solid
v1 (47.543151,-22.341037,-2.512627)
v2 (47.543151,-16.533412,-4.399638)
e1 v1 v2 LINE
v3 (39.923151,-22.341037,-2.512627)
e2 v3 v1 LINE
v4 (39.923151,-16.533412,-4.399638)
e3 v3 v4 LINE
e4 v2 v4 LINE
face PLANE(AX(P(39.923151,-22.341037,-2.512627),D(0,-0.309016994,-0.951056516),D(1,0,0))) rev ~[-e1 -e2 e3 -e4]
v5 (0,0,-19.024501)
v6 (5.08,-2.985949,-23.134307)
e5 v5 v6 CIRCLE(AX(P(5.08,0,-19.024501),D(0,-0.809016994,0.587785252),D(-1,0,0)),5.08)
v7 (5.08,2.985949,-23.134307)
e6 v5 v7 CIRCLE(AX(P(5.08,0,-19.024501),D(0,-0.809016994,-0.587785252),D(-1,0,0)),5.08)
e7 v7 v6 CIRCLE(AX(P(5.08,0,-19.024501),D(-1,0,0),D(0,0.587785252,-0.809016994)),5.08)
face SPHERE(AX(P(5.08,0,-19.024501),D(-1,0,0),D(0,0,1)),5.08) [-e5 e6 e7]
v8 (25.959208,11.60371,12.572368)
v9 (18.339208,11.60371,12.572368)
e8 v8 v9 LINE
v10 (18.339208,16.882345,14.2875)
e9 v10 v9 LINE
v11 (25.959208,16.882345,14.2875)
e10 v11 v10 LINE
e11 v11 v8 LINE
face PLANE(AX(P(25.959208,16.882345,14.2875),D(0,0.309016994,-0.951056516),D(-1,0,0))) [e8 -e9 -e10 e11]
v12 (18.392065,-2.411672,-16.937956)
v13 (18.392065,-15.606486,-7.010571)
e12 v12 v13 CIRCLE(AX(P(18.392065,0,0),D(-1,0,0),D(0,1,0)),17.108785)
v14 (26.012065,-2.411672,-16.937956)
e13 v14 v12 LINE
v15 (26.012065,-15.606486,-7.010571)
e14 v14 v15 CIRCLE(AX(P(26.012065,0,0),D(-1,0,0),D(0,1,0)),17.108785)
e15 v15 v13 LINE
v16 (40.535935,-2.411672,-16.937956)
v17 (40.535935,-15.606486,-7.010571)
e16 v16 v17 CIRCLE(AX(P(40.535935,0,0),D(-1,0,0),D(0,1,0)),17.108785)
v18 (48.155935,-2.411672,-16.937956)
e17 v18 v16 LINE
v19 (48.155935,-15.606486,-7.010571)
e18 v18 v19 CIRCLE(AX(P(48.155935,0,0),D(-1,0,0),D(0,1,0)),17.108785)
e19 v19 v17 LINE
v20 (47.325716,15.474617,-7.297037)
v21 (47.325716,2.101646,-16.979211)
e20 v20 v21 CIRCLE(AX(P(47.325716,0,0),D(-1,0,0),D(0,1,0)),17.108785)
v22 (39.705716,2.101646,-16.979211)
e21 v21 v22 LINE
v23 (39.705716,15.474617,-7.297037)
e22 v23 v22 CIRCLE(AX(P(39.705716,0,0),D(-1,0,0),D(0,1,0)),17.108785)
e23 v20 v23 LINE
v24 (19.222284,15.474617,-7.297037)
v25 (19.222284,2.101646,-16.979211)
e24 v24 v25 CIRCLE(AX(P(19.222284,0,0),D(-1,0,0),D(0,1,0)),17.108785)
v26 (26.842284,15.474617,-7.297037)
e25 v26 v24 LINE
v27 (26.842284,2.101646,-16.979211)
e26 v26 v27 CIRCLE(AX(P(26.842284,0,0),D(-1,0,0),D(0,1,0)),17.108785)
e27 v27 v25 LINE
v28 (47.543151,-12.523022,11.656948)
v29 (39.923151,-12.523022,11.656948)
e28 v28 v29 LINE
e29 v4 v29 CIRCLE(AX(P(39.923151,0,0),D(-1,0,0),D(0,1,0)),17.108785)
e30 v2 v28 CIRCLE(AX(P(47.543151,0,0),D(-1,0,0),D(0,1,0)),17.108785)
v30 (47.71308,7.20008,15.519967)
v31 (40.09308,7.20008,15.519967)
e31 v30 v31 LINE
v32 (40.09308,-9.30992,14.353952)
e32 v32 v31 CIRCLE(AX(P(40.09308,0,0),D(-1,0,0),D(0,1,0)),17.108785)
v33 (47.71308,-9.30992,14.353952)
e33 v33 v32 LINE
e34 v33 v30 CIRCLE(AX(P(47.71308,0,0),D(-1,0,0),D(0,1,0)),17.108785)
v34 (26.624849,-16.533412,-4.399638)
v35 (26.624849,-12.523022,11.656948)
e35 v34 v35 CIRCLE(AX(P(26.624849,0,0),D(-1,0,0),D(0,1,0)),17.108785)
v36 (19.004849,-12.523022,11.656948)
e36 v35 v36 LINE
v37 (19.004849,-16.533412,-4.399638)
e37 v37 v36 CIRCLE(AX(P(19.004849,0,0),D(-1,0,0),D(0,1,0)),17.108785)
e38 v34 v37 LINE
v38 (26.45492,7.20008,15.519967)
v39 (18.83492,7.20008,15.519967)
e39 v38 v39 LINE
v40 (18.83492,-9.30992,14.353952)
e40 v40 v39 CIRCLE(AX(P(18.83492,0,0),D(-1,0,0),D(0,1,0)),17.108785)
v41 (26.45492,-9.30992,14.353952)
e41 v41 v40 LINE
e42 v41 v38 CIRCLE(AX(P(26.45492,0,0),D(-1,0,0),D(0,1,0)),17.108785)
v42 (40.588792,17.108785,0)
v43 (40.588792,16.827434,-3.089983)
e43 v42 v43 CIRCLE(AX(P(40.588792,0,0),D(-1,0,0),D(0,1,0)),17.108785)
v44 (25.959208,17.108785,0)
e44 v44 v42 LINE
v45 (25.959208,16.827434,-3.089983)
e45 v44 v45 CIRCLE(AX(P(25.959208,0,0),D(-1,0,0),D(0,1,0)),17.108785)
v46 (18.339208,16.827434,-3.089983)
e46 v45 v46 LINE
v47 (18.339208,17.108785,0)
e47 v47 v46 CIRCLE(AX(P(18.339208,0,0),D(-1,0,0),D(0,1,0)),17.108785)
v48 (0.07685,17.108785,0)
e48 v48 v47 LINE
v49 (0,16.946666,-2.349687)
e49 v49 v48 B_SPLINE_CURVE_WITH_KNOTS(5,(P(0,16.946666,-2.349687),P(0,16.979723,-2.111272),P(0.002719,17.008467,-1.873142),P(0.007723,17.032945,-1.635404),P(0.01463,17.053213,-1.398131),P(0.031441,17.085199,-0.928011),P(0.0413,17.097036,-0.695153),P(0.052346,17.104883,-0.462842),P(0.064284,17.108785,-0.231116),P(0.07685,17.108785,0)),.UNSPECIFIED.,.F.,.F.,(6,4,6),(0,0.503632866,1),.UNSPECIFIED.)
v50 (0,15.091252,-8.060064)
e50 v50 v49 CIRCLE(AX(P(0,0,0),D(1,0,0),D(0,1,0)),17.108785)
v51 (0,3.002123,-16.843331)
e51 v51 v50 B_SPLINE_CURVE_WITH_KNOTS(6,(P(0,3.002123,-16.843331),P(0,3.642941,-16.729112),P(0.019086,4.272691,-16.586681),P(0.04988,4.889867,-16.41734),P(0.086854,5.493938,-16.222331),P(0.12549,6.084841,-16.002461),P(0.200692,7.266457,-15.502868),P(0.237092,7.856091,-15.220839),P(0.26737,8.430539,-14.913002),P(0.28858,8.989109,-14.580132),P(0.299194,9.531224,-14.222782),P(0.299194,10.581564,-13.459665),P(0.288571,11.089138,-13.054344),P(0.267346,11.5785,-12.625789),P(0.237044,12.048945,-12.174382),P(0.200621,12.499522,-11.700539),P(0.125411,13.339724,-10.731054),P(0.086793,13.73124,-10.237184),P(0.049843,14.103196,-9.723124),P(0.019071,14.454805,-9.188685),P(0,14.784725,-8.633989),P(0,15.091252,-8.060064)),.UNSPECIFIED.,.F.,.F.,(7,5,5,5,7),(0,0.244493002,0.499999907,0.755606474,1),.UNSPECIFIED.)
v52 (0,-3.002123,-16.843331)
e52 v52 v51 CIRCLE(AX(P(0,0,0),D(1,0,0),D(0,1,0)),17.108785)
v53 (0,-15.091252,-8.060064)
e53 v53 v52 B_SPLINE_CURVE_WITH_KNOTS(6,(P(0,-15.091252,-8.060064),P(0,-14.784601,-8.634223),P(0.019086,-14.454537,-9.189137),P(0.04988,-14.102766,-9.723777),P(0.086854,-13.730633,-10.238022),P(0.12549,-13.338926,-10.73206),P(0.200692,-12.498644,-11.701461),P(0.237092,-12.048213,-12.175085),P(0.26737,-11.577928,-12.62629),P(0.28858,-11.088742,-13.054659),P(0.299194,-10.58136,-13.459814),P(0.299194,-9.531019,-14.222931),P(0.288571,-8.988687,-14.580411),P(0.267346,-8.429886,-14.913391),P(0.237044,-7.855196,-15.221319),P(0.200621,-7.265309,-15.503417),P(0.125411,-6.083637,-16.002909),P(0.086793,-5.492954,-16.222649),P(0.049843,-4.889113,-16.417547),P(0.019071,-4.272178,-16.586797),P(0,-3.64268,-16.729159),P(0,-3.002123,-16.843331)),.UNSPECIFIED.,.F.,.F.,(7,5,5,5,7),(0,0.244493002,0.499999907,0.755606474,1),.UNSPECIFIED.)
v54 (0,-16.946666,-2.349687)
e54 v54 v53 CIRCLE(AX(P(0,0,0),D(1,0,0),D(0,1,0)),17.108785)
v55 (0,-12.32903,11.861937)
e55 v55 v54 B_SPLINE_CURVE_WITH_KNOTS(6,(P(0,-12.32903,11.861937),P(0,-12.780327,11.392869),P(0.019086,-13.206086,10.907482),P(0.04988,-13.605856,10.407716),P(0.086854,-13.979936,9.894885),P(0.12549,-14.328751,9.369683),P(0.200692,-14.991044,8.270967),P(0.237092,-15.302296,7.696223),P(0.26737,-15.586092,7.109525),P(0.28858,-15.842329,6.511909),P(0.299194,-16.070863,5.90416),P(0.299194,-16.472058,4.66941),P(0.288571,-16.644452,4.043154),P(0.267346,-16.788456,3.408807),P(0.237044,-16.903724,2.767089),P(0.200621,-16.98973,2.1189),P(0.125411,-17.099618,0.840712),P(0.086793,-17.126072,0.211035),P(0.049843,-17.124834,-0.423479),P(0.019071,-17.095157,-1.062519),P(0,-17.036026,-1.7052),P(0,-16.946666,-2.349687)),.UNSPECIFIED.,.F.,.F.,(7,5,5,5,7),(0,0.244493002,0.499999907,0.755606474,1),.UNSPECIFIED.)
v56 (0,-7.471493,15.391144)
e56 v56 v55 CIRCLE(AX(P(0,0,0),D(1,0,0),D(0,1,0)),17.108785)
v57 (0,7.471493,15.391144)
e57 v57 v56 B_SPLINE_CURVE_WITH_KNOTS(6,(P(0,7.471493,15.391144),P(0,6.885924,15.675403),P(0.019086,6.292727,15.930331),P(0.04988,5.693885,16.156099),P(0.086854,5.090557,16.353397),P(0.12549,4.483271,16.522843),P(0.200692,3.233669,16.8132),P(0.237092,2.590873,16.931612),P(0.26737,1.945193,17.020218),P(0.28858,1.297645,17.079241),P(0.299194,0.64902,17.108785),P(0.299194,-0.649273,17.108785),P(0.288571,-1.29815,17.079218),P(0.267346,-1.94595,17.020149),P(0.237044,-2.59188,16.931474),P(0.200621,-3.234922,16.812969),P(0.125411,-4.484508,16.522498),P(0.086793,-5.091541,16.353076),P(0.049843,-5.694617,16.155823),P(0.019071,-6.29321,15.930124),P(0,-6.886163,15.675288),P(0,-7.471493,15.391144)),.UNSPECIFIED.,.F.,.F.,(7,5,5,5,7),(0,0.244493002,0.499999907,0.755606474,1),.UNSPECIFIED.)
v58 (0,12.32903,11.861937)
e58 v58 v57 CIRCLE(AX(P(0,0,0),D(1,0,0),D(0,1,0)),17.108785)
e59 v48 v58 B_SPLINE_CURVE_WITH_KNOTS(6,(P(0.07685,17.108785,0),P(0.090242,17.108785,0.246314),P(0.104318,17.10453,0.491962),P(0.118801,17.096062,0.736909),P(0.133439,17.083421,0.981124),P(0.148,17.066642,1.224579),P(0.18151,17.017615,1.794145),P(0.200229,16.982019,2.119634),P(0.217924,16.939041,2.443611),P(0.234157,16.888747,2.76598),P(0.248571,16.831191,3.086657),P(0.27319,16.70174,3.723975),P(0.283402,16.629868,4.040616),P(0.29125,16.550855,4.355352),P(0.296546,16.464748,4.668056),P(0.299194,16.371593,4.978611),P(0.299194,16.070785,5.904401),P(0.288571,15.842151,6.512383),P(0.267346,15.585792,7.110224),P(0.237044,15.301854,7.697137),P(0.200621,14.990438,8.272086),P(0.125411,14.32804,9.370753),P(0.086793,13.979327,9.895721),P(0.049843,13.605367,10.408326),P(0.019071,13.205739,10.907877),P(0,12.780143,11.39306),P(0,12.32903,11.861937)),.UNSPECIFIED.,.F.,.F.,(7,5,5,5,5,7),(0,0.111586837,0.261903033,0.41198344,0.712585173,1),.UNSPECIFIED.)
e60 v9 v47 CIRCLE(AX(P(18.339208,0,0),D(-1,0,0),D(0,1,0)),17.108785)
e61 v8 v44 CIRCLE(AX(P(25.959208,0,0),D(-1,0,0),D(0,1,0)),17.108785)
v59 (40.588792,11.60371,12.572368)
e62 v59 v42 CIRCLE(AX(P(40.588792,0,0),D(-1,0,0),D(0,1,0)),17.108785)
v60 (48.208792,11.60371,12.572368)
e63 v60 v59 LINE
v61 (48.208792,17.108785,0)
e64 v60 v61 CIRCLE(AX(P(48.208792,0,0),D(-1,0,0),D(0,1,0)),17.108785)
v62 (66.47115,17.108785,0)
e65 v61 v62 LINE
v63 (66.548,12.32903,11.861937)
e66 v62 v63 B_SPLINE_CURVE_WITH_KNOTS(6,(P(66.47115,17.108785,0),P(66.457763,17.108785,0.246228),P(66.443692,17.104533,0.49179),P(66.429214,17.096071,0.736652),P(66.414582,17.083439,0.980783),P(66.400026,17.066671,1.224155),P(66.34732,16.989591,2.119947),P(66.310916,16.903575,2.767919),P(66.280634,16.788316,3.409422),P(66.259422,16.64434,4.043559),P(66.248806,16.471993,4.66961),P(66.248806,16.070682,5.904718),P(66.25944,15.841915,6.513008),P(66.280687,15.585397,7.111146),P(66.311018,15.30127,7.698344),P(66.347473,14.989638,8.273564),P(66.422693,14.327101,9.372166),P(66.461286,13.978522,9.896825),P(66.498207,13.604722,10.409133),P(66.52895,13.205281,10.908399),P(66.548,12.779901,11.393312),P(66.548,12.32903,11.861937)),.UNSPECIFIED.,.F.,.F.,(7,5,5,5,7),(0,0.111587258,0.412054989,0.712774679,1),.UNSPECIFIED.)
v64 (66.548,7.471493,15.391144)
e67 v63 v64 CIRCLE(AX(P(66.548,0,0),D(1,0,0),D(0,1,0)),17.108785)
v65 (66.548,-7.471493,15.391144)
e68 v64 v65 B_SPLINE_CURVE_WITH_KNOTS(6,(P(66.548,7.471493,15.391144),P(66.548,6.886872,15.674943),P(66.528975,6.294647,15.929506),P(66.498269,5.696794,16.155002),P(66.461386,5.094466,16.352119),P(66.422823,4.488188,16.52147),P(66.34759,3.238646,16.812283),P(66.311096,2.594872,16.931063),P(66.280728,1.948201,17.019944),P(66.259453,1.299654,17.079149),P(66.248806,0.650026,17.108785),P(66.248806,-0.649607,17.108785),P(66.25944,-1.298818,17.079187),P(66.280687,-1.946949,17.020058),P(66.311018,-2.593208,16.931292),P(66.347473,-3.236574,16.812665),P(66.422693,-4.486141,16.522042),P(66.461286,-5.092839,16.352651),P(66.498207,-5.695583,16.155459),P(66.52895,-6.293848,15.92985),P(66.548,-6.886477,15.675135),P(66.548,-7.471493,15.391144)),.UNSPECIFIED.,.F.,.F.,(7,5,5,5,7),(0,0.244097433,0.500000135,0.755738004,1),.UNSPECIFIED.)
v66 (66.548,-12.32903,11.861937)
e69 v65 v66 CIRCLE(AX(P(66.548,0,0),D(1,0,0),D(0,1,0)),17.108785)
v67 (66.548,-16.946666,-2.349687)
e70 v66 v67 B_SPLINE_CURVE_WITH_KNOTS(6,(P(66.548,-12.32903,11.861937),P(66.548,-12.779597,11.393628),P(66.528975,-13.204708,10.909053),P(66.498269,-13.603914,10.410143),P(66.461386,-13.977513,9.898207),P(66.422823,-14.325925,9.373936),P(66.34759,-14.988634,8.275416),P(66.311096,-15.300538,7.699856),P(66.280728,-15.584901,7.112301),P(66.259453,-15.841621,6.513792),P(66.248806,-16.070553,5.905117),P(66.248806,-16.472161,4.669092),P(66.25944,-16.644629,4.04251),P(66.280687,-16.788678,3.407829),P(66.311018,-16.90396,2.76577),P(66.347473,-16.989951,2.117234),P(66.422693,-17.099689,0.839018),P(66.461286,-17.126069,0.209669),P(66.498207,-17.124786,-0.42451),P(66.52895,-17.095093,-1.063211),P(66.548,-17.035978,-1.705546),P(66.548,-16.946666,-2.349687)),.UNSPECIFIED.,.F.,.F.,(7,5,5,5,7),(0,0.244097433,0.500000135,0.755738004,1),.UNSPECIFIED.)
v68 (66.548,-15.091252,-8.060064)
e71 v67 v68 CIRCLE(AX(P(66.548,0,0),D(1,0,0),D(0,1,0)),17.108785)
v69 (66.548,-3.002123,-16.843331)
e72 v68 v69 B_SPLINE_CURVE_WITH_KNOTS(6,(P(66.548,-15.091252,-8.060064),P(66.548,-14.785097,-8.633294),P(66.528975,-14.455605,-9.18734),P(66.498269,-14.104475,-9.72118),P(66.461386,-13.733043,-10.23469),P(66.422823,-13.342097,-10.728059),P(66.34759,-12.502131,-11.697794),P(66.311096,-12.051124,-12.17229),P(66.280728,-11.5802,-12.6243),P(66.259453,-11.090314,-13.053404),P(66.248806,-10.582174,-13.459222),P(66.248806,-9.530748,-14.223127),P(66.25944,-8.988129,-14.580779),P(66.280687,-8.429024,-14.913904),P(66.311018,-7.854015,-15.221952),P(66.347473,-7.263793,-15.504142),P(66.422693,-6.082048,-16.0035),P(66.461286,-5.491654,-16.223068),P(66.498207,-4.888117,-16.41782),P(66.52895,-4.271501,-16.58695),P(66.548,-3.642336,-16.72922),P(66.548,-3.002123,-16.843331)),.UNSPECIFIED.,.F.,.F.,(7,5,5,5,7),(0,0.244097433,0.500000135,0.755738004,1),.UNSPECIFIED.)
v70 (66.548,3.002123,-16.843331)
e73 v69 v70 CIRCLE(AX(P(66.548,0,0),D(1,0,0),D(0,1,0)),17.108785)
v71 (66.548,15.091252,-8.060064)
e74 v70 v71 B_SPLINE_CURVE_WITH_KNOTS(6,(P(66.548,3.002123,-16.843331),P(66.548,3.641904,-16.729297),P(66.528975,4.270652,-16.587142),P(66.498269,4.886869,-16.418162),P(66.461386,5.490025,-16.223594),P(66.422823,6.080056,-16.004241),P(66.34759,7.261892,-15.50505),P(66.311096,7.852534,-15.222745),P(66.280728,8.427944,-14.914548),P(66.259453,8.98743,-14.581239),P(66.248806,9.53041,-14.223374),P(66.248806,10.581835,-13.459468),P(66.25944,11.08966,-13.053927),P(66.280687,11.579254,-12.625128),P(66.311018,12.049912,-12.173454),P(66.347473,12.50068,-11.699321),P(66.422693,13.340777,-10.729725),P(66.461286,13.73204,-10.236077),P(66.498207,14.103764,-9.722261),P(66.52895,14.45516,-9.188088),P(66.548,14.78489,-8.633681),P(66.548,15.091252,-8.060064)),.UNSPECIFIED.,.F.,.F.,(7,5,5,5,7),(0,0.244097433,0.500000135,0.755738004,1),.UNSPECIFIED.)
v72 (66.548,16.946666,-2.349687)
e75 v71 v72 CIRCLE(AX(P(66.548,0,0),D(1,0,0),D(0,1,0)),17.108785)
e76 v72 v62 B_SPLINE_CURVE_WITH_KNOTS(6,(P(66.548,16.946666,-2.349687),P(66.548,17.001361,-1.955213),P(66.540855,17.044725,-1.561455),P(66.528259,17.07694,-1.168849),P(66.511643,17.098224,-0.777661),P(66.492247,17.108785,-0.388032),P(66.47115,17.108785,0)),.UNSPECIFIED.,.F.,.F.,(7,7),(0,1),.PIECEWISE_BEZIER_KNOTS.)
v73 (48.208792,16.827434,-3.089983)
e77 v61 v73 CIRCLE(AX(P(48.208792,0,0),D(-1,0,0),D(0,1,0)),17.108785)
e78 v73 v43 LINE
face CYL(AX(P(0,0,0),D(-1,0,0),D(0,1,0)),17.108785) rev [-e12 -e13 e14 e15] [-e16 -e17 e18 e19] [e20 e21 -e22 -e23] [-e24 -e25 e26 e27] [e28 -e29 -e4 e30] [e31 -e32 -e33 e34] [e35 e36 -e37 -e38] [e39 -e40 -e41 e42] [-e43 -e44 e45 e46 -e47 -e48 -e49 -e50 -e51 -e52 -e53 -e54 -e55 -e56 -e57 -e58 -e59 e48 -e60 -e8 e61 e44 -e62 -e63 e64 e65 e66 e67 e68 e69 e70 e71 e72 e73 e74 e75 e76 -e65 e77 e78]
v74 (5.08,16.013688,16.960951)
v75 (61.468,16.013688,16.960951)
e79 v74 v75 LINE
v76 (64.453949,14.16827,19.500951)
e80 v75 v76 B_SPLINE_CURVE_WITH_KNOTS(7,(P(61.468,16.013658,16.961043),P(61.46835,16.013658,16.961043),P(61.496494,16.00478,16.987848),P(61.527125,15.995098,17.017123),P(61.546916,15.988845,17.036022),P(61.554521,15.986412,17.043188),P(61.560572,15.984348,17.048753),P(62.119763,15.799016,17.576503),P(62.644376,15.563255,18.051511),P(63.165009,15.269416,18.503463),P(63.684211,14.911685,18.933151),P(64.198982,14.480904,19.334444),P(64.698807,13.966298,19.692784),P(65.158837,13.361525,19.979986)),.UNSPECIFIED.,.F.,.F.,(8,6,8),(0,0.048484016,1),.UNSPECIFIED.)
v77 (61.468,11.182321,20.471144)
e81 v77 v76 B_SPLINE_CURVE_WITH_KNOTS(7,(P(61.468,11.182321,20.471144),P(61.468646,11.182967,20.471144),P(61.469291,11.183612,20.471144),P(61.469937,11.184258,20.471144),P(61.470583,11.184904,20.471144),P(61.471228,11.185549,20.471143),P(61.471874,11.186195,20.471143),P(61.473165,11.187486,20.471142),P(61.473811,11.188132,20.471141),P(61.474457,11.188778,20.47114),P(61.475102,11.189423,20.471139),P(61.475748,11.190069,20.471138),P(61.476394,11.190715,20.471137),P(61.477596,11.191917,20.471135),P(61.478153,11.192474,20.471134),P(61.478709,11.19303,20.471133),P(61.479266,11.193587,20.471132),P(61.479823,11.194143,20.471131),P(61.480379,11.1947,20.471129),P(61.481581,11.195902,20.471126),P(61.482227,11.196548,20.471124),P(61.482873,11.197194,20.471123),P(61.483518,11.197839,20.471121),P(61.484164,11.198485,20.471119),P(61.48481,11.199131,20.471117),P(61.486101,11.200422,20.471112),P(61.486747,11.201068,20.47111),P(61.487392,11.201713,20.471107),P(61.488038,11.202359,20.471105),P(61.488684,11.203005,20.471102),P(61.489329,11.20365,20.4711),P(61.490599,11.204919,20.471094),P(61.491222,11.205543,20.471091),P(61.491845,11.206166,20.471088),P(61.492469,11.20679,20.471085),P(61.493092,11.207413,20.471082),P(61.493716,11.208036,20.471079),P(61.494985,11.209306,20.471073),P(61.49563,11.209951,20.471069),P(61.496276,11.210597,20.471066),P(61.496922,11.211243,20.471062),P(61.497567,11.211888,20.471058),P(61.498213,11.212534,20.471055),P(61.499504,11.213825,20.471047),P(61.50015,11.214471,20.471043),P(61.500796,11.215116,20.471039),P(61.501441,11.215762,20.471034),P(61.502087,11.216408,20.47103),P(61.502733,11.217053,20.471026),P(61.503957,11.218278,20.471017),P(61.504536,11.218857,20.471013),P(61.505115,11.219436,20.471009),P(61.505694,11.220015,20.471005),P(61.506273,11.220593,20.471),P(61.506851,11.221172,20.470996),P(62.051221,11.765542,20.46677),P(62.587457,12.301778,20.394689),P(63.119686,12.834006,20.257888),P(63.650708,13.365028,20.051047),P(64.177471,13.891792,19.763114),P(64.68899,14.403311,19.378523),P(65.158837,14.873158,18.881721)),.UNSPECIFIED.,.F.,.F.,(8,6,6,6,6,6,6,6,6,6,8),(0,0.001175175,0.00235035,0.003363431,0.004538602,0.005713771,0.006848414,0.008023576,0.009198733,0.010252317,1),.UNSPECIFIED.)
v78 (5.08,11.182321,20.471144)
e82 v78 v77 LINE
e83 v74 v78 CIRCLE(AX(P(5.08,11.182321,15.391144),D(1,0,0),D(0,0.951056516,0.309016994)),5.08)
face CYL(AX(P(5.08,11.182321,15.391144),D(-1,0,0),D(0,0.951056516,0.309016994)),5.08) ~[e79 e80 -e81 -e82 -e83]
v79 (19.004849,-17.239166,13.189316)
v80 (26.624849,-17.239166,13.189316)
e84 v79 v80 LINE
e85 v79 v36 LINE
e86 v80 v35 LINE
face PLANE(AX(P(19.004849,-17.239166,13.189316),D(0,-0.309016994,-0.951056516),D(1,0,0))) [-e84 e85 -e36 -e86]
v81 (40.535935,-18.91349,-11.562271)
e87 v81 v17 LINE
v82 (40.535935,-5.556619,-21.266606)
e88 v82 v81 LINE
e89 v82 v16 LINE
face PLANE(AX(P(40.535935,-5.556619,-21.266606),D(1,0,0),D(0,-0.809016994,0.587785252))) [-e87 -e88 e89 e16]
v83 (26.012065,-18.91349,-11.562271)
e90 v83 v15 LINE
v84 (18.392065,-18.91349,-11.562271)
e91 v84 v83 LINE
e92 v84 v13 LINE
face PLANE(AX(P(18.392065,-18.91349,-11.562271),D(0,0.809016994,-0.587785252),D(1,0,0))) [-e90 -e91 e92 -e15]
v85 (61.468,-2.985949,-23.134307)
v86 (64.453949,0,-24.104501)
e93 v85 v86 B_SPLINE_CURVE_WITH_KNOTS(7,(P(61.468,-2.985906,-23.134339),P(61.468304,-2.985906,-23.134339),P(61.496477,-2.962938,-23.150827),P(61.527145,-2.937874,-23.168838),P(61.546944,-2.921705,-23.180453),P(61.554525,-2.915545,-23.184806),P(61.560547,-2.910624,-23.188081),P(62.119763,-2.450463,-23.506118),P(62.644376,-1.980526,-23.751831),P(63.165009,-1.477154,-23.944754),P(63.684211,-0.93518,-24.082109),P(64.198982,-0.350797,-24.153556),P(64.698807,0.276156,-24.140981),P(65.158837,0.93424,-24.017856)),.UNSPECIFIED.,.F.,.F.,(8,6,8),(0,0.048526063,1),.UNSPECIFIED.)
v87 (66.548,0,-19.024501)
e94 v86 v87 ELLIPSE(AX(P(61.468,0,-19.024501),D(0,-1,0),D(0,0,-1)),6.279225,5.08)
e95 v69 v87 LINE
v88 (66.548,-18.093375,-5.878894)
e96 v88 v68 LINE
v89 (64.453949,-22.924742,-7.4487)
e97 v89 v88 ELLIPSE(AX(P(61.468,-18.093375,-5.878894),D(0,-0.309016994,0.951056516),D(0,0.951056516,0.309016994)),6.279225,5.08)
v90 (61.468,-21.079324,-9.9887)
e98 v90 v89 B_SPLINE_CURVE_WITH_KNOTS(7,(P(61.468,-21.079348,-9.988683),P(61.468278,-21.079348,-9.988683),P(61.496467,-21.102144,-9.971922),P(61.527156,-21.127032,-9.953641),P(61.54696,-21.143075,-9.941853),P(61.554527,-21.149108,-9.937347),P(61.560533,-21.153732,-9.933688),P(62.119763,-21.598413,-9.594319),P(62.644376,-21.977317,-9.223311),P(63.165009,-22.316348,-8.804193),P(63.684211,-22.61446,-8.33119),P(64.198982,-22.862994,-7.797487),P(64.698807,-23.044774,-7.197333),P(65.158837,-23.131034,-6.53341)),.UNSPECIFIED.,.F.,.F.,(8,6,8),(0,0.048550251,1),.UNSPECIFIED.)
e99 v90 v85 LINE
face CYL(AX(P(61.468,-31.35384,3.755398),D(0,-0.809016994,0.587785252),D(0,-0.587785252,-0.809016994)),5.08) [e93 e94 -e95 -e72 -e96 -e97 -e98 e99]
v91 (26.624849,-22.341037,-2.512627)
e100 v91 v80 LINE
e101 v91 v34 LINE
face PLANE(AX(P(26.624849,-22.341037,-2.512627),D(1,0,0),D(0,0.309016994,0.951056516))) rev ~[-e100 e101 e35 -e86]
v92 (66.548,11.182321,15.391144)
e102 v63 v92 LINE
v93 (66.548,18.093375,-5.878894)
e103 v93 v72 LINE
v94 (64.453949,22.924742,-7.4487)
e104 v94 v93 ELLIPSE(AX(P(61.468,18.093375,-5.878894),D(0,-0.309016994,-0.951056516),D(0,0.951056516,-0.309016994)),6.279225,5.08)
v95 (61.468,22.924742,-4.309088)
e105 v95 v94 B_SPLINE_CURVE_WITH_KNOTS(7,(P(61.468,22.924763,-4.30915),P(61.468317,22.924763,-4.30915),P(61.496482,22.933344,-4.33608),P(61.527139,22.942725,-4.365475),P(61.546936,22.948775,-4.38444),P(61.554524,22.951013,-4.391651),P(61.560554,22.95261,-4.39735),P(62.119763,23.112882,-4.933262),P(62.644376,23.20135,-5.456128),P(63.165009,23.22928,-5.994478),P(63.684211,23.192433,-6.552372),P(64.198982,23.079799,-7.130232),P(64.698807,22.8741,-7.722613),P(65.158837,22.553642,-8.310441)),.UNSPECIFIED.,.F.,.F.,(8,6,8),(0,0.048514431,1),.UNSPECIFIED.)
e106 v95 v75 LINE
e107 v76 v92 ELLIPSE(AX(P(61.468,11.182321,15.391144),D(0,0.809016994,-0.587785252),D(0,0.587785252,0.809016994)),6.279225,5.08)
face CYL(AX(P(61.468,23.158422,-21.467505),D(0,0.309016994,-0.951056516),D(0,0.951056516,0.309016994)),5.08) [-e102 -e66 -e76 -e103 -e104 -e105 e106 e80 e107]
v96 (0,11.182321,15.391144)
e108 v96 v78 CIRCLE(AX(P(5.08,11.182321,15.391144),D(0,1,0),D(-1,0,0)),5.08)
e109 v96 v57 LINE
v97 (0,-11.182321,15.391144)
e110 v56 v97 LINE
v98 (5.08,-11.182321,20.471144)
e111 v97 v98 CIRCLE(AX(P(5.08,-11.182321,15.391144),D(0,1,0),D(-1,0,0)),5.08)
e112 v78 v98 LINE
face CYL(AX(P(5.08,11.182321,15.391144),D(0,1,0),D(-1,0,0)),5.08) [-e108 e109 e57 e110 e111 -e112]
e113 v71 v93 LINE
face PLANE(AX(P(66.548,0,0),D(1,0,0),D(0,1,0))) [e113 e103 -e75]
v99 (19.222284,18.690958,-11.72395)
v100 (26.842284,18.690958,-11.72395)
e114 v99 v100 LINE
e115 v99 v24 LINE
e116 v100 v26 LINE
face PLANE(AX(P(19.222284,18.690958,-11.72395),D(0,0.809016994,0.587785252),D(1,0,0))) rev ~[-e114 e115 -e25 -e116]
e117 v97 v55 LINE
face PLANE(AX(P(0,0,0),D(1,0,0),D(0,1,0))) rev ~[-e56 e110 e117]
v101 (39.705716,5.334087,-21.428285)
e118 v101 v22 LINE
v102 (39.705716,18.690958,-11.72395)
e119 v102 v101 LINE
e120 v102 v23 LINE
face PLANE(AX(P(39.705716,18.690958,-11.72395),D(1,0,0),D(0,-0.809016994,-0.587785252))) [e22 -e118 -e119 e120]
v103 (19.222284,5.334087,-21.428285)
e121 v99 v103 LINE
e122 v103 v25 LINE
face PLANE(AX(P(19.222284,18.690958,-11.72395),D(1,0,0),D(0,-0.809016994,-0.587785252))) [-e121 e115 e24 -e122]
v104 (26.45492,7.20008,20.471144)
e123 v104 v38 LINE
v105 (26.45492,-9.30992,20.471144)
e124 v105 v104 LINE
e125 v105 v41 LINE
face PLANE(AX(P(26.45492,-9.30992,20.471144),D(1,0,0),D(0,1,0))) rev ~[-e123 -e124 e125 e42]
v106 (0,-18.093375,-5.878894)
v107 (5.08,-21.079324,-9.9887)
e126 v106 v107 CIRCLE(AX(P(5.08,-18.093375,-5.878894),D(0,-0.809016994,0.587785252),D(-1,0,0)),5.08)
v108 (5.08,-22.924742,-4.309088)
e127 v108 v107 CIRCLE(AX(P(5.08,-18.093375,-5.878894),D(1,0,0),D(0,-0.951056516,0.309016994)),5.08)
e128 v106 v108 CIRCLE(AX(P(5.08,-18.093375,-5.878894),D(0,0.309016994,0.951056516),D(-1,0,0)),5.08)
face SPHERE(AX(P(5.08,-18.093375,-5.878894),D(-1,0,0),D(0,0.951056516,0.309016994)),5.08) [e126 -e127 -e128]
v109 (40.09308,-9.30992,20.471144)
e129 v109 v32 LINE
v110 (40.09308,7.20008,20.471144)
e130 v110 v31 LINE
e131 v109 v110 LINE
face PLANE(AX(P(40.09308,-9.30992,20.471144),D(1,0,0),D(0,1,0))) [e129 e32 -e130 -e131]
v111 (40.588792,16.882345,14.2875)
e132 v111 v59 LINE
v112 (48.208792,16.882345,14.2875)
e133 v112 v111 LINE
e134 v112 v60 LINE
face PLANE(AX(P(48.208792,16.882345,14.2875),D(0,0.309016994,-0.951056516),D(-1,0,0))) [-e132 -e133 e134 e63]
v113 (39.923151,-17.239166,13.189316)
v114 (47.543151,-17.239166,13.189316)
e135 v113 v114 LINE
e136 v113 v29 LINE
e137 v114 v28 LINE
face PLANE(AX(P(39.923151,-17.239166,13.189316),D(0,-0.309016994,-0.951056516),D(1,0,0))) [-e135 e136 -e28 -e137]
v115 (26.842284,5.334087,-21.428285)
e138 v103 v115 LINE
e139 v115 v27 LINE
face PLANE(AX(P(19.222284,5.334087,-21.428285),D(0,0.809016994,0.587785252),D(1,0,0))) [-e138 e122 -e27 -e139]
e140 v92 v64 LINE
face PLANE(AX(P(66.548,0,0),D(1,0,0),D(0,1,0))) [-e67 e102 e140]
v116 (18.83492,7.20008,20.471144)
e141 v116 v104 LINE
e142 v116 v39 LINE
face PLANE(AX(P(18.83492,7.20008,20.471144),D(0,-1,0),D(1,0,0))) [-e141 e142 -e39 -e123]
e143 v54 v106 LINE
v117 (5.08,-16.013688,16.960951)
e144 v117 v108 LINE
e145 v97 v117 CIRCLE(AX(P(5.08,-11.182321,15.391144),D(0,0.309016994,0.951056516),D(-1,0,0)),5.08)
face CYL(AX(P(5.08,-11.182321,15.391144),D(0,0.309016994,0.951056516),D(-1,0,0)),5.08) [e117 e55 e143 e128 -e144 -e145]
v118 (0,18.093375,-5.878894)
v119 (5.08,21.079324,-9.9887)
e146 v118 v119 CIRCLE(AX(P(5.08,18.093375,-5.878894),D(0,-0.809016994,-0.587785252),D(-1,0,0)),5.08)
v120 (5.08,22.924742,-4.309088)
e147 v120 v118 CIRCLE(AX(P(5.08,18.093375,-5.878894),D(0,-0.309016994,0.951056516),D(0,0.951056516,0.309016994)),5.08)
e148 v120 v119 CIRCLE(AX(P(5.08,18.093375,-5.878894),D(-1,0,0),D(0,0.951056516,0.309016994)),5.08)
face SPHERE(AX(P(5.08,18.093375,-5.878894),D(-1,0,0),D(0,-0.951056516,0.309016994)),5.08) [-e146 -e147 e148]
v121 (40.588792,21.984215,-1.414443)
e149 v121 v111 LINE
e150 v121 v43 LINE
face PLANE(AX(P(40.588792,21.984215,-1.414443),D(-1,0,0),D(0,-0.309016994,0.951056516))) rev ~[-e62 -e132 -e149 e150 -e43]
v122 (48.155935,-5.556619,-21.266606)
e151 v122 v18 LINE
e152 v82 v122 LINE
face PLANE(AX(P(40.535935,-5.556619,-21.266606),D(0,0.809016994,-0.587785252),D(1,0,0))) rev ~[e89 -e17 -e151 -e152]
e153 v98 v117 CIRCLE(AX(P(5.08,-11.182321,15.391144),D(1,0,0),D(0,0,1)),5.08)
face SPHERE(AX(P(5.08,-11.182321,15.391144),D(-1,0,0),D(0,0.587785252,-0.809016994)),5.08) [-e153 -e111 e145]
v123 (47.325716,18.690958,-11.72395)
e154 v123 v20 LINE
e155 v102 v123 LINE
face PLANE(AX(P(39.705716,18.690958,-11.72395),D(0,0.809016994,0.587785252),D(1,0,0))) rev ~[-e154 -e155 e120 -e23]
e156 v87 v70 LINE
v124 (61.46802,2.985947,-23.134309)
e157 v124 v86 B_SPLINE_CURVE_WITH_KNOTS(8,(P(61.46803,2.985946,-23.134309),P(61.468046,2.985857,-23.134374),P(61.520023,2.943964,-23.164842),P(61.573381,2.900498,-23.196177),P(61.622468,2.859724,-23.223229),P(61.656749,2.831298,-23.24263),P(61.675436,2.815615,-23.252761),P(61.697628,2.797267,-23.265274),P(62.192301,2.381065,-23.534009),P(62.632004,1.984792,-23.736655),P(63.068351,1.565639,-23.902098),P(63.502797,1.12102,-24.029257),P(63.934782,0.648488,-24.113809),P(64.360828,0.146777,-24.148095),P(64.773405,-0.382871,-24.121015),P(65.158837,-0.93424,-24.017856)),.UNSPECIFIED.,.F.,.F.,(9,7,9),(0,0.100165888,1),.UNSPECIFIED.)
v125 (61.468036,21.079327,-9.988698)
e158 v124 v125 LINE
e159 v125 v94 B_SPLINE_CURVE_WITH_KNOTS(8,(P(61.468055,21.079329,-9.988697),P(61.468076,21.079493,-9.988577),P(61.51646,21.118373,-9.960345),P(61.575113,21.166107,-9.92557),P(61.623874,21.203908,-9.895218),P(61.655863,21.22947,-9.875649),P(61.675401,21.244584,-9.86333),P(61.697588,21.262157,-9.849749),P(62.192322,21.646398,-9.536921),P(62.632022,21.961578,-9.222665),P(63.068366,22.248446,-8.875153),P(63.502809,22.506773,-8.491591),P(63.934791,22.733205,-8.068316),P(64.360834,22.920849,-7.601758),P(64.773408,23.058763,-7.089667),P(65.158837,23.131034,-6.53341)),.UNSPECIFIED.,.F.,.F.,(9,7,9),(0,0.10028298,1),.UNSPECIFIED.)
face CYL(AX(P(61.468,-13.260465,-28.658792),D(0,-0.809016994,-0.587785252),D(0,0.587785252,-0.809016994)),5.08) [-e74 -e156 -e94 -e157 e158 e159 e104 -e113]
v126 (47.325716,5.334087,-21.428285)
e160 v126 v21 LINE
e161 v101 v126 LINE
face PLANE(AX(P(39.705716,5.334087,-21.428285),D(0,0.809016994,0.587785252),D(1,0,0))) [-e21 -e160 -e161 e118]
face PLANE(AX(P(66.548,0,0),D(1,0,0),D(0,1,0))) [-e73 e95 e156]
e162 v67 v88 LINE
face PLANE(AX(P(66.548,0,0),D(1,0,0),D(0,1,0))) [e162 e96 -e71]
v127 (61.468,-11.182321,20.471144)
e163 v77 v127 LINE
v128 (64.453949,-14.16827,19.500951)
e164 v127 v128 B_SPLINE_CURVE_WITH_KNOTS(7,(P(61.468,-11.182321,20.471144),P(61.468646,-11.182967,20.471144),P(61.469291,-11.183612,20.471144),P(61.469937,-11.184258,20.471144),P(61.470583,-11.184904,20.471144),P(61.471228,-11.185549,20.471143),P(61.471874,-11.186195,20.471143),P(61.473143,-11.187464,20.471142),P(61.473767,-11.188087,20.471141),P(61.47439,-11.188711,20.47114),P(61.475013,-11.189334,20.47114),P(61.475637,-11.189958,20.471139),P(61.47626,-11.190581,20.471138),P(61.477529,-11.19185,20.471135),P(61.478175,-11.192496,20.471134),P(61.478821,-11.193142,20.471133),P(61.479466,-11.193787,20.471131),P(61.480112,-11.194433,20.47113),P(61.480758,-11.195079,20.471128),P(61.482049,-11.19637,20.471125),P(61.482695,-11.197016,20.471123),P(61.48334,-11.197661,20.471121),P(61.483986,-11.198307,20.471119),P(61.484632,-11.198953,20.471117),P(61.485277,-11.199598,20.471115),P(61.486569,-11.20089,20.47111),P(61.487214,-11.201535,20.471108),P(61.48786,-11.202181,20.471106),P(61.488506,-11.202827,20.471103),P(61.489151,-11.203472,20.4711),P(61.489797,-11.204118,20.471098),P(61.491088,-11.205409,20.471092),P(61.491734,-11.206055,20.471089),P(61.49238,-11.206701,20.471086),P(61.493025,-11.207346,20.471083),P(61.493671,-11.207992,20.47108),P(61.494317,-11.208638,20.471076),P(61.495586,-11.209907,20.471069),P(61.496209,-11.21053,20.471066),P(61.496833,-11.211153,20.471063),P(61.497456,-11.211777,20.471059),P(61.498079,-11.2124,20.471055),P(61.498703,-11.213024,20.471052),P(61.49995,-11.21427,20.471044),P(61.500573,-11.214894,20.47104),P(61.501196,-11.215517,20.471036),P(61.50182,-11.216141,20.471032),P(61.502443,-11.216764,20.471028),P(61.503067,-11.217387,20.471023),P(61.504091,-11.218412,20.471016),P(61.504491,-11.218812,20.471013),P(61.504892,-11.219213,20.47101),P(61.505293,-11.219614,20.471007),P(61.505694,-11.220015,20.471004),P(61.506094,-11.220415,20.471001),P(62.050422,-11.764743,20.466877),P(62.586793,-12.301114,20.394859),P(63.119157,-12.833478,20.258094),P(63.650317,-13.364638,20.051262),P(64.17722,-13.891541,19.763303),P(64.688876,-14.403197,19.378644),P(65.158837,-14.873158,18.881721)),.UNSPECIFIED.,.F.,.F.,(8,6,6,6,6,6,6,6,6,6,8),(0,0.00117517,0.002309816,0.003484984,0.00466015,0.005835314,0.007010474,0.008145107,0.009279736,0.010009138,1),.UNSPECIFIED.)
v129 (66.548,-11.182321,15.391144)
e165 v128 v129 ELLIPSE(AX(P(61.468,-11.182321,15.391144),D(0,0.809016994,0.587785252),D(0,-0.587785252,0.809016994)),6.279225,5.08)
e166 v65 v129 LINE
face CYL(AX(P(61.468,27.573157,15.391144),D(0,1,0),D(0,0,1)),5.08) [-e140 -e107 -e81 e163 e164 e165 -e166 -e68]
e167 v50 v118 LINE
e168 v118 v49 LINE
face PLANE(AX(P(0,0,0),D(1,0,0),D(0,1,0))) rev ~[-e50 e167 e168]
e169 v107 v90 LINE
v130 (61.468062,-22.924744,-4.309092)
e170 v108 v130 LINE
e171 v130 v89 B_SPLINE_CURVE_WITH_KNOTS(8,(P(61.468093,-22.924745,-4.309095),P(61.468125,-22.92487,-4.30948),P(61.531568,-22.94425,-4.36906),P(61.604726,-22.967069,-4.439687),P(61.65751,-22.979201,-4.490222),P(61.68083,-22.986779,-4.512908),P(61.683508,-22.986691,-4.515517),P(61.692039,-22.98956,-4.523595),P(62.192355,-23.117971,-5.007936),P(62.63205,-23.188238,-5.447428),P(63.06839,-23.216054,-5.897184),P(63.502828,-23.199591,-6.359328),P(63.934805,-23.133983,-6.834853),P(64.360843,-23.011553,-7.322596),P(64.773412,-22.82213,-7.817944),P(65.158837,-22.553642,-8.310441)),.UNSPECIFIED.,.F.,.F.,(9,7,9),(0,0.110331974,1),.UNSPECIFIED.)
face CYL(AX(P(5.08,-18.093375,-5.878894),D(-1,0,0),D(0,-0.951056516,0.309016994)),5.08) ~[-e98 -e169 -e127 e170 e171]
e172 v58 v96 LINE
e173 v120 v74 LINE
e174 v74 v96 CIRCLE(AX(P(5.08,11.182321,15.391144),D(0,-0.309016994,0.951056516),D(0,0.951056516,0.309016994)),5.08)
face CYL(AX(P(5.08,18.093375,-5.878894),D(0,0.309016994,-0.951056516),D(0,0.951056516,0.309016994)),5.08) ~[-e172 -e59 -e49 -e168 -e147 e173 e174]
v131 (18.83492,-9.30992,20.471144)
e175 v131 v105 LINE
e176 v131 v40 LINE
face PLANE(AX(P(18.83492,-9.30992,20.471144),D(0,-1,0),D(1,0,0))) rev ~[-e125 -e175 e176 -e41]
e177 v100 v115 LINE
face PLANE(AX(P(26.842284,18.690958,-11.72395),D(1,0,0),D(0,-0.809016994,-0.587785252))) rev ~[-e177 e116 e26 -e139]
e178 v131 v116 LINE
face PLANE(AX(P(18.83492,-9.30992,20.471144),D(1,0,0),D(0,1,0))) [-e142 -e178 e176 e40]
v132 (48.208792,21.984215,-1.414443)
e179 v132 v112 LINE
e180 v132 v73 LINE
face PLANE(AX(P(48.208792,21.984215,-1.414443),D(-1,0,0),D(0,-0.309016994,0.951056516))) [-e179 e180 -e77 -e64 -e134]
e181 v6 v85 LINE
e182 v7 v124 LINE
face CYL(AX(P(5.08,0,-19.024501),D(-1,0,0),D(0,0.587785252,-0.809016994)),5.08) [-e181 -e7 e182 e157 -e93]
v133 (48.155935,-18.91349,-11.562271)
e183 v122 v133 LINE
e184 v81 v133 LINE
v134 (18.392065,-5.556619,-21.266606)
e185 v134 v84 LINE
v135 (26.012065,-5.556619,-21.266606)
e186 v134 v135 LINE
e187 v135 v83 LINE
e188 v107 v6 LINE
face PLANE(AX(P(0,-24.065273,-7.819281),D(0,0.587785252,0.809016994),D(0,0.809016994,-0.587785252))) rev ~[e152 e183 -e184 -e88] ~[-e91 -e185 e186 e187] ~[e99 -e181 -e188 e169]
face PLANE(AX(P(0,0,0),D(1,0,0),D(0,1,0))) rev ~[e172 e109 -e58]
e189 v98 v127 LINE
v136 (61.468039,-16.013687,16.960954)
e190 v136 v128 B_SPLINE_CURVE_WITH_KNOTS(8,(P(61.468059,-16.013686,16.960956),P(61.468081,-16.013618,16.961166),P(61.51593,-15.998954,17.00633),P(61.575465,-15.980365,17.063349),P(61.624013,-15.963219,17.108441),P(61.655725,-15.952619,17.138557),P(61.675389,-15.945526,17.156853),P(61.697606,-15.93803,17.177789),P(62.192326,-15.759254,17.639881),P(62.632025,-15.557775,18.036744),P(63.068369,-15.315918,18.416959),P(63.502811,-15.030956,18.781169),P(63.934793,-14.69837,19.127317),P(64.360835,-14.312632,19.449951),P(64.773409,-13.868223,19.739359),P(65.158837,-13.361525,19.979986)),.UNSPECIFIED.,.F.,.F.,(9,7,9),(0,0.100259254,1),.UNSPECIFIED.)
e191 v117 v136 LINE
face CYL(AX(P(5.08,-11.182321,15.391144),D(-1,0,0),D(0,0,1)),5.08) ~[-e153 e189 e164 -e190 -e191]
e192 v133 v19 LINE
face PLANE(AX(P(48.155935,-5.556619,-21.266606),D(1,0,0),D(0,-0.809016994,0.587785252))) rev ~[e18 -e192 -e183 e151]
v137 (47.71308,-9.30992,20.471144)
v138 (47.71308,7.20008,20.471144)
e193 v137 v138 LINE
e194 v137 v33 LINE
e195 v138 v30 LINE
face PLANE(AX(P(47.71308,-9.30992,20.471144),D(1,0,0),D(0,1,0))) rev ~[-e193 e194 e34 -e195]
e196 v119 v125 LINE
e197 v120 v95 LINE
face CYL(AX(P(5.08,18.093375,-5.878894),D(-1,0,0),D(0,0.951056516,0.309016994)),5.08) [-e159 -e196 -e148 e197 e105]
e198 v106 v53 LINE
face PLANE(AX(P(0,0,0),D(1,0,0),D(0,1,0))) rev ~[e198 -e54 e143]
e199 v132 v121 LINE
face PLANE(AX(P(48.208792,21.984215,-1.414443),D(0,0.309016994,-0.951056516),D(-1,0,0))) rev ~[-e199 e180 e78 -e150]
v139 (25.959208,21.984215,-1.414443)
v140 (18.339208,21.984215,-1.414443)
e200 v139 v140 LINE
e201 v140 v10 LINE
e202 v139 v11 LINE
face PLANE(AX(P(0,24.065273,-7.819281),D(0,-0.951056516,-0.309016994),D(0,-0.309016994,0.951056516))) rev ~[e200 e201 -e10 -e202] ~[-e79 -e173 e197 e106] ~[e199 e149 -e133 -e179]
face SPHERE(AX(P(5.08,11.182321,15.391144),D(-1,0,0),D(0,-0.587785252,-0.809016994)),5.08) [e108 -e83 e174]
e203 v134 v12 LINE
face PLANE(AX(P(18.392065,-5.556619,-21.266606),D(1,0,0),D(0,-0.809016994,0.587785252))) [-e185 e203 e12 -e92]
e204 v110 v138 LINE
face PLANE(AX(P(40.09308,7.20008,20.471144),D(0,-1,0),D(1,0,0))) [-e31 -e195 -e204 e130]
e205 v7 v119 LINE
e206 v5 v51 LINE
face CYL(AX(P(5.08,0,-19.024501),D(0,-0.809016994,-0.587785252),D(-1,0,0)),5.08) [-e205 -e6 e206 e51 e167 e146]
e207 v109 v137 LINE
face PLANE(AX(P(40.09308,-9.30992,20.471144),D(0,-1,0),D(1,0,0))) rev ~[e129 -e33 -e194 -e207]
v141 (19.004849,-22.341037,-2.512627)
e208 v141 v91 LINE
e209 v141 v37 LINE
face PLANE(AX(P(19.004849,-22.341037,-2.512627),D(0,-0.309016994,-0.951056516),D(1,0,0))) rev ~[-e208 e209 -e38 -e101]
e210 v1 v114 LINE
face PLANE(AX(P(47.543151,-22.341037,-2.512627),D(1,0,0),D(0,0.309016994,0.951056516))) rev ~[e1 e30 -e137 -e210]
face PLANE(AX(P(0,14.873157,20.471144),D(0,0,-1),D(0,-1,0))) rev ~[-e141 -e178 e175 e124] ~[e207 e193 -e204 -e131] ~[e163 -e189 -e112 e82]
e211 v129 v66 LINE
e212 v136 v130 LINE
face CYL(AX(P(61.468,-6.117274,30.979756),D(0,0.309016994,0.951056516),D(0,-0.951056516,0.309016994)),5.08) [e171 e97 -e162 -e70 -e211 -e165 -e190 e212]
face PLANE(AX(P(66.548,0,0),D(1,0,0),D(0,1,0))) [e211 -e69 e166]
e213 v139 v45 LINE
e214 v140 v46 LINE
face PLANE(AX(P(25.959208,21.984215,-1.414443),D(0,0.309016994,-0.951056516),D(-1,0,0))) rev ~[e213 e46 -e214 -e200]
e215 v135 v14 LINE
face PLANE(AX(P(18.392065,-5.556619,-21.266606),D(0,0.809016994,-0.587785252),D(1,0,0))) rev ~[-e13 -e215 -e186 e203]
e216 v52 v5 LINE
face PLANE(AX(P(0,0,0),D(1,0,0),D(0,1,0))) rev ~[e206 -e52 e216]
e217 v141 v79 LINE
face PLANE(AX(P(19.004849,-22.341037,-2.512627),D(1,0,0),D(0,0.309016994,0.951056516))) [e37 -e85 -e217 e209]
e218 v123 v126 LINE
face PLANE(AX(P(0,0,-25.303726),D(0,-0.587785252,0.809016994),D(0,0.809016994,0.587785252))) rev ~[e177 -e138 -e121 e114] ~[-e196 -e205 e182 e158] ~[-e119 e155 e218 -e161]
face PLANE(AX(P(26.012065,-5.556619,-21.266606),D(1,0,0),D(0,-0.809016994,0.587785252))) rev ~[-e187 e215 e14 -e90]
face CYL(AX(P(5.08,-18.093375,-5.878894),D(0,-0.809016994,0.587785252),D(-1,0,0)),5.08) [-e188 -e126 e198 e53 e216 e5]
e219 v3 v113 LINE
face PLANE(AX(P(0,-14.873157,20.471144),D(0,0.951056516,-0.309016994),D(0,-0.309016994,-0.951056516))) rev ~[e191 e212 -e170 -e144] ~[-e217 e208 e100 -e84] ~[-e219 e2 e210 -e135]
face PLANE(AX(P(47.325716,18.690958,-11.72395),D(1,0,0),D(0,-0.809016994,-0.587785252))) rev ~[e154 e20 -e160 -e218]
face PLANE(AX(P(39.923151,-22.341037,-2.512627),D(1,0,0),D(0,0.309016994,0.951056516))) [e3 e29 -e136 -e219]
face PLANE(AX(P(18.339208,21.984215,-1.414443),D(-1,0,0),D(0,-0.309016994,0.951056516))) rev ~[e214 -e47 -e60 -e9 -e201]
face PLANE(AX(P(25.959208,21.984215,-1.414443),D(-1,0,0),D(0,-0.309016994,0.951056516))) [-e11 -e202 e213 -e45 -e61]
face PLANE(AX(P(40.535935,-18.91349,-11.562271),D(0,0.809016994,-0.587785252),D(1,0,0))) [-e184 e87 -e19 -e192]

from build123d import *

# Parameters (mm, degrees)
F0_R         = 17.1087851354
F1_DEPTH     = 66.548
F2_T1_DEPTH  = 55.1463138897
F2_T3_DEPTH  = 55.1463138897
F2_T5_DEPTH  = 55.1463138897
F2_T7_DEPTH  = 55.1463138897
F2_T9_DEPTH  = 55.1463138897
F3_T1_DEPTH  = 22.3646418052
F3_T3_DEPTH  = 22.3646418052
F3_T5_DEPTH  = 22.3646418052
F3_T7_DEPTH  = 22.3646418052
F3_T9_DEPTH  = 22.3646418052
F3_T11_DEPTH = 65.6150901057
F3_T16_DEPTH = 5.1816
F3_T22_DEPTH = 5.1816
F3_T28_DEPTH = 5.1816
F3_T34_DEPTH = 5.1816
F3_T40_DEPTH = 5.1816
F4_W         = 7.62
F4_H         = 16.51
F5_DEPTH     = 7.874
F6_W         = 7.62
F6_H         = 16.51
F7_DEPTH     = 7.112
F8_W         = 7.62
F8_H         = 16.51
F9_DEPTH     = 12.192
F10_W        = 7.62
F10_H        = 16.51
F11_DEPTH    = 24.384
F12_W        = 7.62
F12_H        = 16.51
F13_DEPTH    = 25.4


# Not quite as in the source:
# - a fillet or chamfer that OpenCascade refuses, or shapes differently, is made with other operations: its cross-section is extruded or revolved along the edge and cut away or added


with BuildPart() as f1:
    # F0 (on Right) → F1 (new body)
    with BuildSketch(Plane.YZ):
        Polygon((14.8731569449, 20.4711443192), (-14.8731569449, 20.4711443192), (-24.0652734568, -7.8192813413), (0, -25.3037259558), (24.0652734568, -7.8192813413), align=None)
        Circle(F0_R, mode=Mode.SUBTRACT)
    extrude(amount=F1_DEPTH)

    # F2: fillet of radius 5.08 on 5 edges, made by hand

    # F2_s2 → F2_t1 (cut)
    with BuildSketch(Plane(origin=(0, 8.5205740845, 26.2236305872), x_dir=(1, 0, 0), z_dir=(0, -0.3090169944, -0.9510565163))):
        with BuildLine():
            ThreePointArc((61.468, 20.4711443192), (65.0601024484, 18.9832467676), (66.548, 15.3911443192))
            Line((66.548, 15.3911443192), (66.548, 20.4711443192))
            Line((66.548, 20.4711443192), (61.468, 20.4711443192))
        make_face()
    extrude(amount=F2_T1_DEPTH, mode=Mode.SUBTRACT)

    # F2_s4 → F2_t3 (cut)
    with BuildSketch(Plane.XZ.offset(-27.5731569449)):
        with BuildLine():
            ThreePointArc((61.468, 20.4711443192), (65.0601024484, 18.9832467676), (66.548, 15.3911443192))
            Line((66.548, 15.3911443192), (66.548, 20.4711443192))
            Line((66.548, 20.4711443192), (61.468, 20.4711443192))
        make_face()
    extrude(amount=F2_T3_DEPTH, mode=Mode.SUBTRACT)

    # F2_s6 → F2_t5 (cut)
    with BuildSketch(Plane(origin=(0, 8.5205740845, -26.2236305872), x_dir=(1, 0, 0), z_dir=(0, -0.3090169944, 0.9510565163))):
        with BuildLine():
            ThreePointArc((61.468, 20.4711443192), (65.0601024484, 18.9832467676), (66.548, 15.3911443192))
            Line((66.548, 15.3911443192), (66.548, 20.4711443192))
            Line((66.548, 20.4711443192), (61.468, 20.4711443192))
        make_face()
    extrude(amount=F2_T5_DEPTH, mode=Mode.SUBTRACT)

    # F2_s8 → F2_t7 (cut)
    with BuildSketch(Plane(origin=(0, -22.307152557, -16.2070950113), x_dir=(1, 0, 0), z_dir=(0, 0.8090169944, 0.5877852523))):
        with BuildLine():
            ThreePointArc((61.468, 20.4711443192), (65.0601024484, 18.9832467676), (66.548, 15.3911443192))
            Line((66.548, 15.3911443192), (66.548, 20.4711443192))
            Line((66.548, 20.4711443192), (61.468, 20.4711443192))
        make_face()
    extrude(amount=F2_T7_DEPTH, mode=Mode.SUBTRACT)

    # F2_s10 → F2_t9 (cut)
    with BuildSketch(Plane(origin=(0, -22.307152557, 16.2070950113), x_dir=(1, 0, 0), z_dir=(0, 0.8090169944, -0.5877852523))):
        with BuildLine():
            ThreePointArc((61.468, 20.4711443192), (65.0601024484, 18.9832467676), (66.548, 15.3911443192))
            Line((66.548, 15.3911443192), (66.548, 20.4711443192))
            Line((66.548, 20.4711443192), (61.468, 20.4711443192))
        make_face()
    extrude(amount=F2_T9_DEPTH, mode=Mode.SUBTRACT)

    # F3: fillet of radius 5.08 on 14 edges, made by hand

    # F3_s2 → F3_t1 (cut)
    with BuildSketch(Plane(origin=(0, 3.4555271955, -10.6350191617), x_dir=(1, 0, 0), z_dir=(0, -0.3090169944, 0.9510565163))):
        with BuildLine():
            ThreePointArc((5.08, 20.4711443192), (1.4878975516, 18.9832467676), (0, 15.3911443192))
            Line((0, 15.3911443192), (0, 20.4711443192))
            Line((0, 20.4711443192), (5.08, 20.4711443192))
        make_face()
    extrude(amount=F3_T1_DEPTH, mode=Mode.SUBTRACT)

    # F3_s4 → F3_t3 (cut)
    with BuildSketch(Plane.XZ.offset(-11.1823209026)):
        with BuildLine():
            ThreePointArc((0, 15.3911443192), (1.4878975516, 18.9832467676), (5.08, 20.4711443192))
            Line((5.08, 20.4711443192), (0, 20.4711443192))
            Line((0, 20.4711443192), (0, 15.3911443192))
        make_face()
    extrude(amount=F3_T3_DEPTH, mode=Mode.SUBTRACT)

    # F3_s6 → F3_t5 (cut)
    with BuildSketch(Plane(origin=(0, 3.4555271955, 10.6350191617), x_dir=(1, 0, 0), z_dir=(0, -0.3090169944, -0.9510565163))):
        with BuildLine():
            ThreePointArc((0, 15.3911443192), (1.4878975516, 18.9832467676), (5.08, 20.4711443192))
            Line((5.08, 20.4711443192), (0, 20.4711443192))
            Line((0, 20.4711443192), (0, 15.3911443192))
        make_face()
    extrude(amount=F3_T5_DEPTH, mode=Mode.SUBTRACT)

    # F3_s8 → F3_t7 (cut)
    with BuildSketch(Plane(origin=(0, -9.0466876467, 6.5728033129), x_dir=(1, 0, 0), z_dir=(0, 0.8090169944, -0.5877852523))):
        with BuildLine():
            ThreePointArc((0, 15.3911443192), (1.4878975516, 18.9832467676), (5.08, 20.4711443192))
            Line((5.08, 20.4711443192), (0, 20.4711443192))
            Line((0, 20.4711443192), (0, 15.3911443192))
        make_face()
    extrude(amount=F3_T7_DEPTH, mode=Mode.SUBTRACT)

    # F3_s10 → F3_t9 (cut)
    with BuildSketch(Plane(origin=(0, -9.0466876467, -6.5728033129), x_dir=(1, 0, 0), z_dir=(0, 0.8090169944, 0.5877852523))):
        with BuildLine():
            ThreePointArc((0, 15.3911443192), (1.4878975516, 18.9832467676), (5.08, 20.4711443192))
            Line((5.08, 20.4711443192), (0, 20.4711443192))
            Line((0, 20.4711443192), (0, 15.3911443192))
        make_face()
    extrude(amount=F3_T9_DEPTH, mode=Mode.SUBTRACT)

    # F3_s12 → F3_t11 (cut)
    with BuildSketch(Plane.YZ.offset(5.08)):
        with BuildLine():
            ThreePointArc((-22.9247423963, -4.3090876728), (-22.9247423963, -7.4487003356), (-21.0793243751, -9.9887003356))
            Line((-21.0793243751, -9.9887003356), (-24.0652734568, -7.8192813413))
            Line((-24.0652734568, -7.8192813413), (-22.9247423963, -4.3090876728))
        make_face()
        with BuildLine():
            ThreePointArc((-11.1823209026, 20.4711443192), (-14.1682699842, 19.5009506506), (-16.0136880054, 16.9609506506))
            Line((-16.0136880054, 16.9609506506), (-14.8731569449, 20.4711443192))
            Line((-14.8731569449, 20.4711443192), (-11.1823209026, 20.4711443192))
        make_face()
        with BuildLine():
            ThreePointArc((2.9859490816, -23.1343069615), (0, -24.1045006301), (-2.9859490816, -23.1343069615))
            Line((-2.9859490816, -23.1343069615), (0, -25.3037259558))
            Line((0, -25.3037259558), (2.9859490816, -23.1343069615))
        make_face()
        with BuildLine():
            ThreePointArc((22.9247423963, -4.3090876728), (22.9247423963, -7.4487003356), (21.0793243751, -9.9887003356))
            Line((21.0793243751, -9.9887003356), (24.0652734568, -7.8192813413))
            Line((24.0652734568, -7.8192813413), (22.9247423963, -4.3090876728))
        make_face()
        with BuildLine():
            ThreePointArc((16.0136880054, 16.9609506506), (14.1682699842, 19.5009506506), (11.1823209026, 20.4711443192))
            Line((11.1823209026, 20.4711443192), (14.8731569449, 20.4711443192))
            Line((14.8731569449, 20.4711443192), (16.0136880054, 16.9609506506))
        make_face()
    extrude(amount=F3_T11_DEPTH, mode=Mode.SUBTRACT)


with BuildPart() as f3_tool14:
    # F3_s15 → F3_t16 (new body)
    with BuildSketch(Plane.YZ.offset(5.08)):
        Polygon((18.0933752935, -5.8788940042), (21.1390433568, -10.0708964622), (24.18471142, -7.8580890881), (23.0213697383, -4.2776915461), align=None)
    extrude(amount=-F3_T16_DEPTH)

    # F3_s17 → F3_t18 (revolve, cut)
    with BuildSketch(Plane(origin=(5.08, 18.0933752935, -5.8788940042), x_dir=(0, -0.9510565163, 0.3090169944), z_dir=(0, -0.3090169944, -0.9510565163))):
        with BuildLine():
            ThreePointArc((0, -5.08), (5.08, 0), (0, 5.08))
            Line((0, 5.08), (0, -5.08))
        make_face()
    revolve(axis=Axis((5.08, 18.0933752935, -5.8788940042), (-1, 0, 0)), mode=Mode.SUBTRACT)


with BuildPart() as f1_1:
    add(f1.part)

    # F3_t13: cut F3_tool14
    add(f3_tool14.part, mode=Mode.SUBTRACT)


with BuildPart() as f3_tool20:
    # F3_s21 → F3_t22 (new body)
    with BuildSketch(Plane.YZ.offset(5.08)):
        Polygon((11.1823209026, 15.3911443192), (11.1823209026, 20.5727443192), (14.9469736657, 20.5727443192), (16.1103153474, 16.9923467773), align=None)
    extrude(amount=-F3_T22_DEPTH)

    # F3_s23 → F3_t24 (revolve, cut)
    with BuildSketch(Plane(origin=(5.08, 11.1823209026, 15.3911443192), x_dir=(0, -0.5877852523, -0.8090169944), z_dir=(0, 0.8090169944, -0.5877852523))):
        with BuildLine():
            ThreePointArc((0, -5.08), (5.08, 0), (0, 5.08))
            Line((0, 5.08), (0, -5.08))
        make_face()
    revolve(axis=Axis((5.08, 11.1823209026, 15.3911443192), (-1, 0, 0)), mode=Mode.SUBTRACT)


with BuildPart() as f1_2:
    add(f1_1.part)

    # F3_t19: cut F3_tool20
    add(f3_tool20.part, mode=Mode.SUBTRACT)


with BuildPart() as f3_tool26:
    # F3_s27 → F3_t28 (new body)
    with BuildSketch(Plane.YZ.offset(5.08)):
        Polygon((-11.1823209026, 15.3911443192), (-11.1823209026, 20.5727443192), (-14.9469736657, 20.5727443192), (-16.1103153474, 16.9923467773), align=None)
    extrude(amount=-F3_T28_DEPTH)

    # F3_s29 → F3_t30 (revolve, cut)
    with BuildSketch(Plane(origin=(5.08, -11.1823209026, 15.3911443192), x_dir=(0, 0.5877852523, -0.8090169944), z_dir=(0, 0.8090169944, 0.5877852523))):
        with BuildLine():
            ThreePointArc((0, -5.08), (5.08, 0), (0, 5.08))
            Line((0, 5.08), (0, -5.08))
        make_face()
    revolve(axis=Axis((5.08, -11.1823209026, 15.3911443192), (-1, 0, 0)), mode=Mode.SUBTRACT)


with BuildPart() as f1_3:
    add(f1_2.part)

    # F3_t25: cut F3_tool26
    add(f3_tool26.part, mode=Mode.SUBTRACT)


with BuildPart() as f3_tool32:
    # F3_s33 → F3_t34 (new body)
    with BuildSketch(Plane.YZ.offset(5.08)):
        Polygon((-18.0933752935, -5.8788940042), (-23.0213697383, -4.2776915461), (-24.18471142, -7.8580890881), (-21.1390433568, -10.0708964622), align=None)
    extrude(amount=-F3_T34_DEPTH)

    # F3_s35 → F3_t36 (revolve, cut)
    with BuildSketch(Plane(origin=(5.08, -18.0933752935, -5.8788940042), x_dir=(0, 0.9510565163, 0.3090169944), z_dir=(0, -0.3090169944, 0.9510565163))):
        with BuildLine():
            ThreePointArc((0, -5.08), (5.08, 0), (0, 5.08))
            Line((0, 5.08), (0, -5.08))
        make_face()
    revolve(axis=Axis((5.08, -18.0933752935, -5.8788940042), (-1, 0, 0)), mode=Mode.SUBTRACT)


with BuildPart() as f1_4:
    add(f1_3.part)

    # F3_t31: cut F3_tool32
    add(f3_tool32.part, mode=Mode.SUBTRACT)


with BuildPart() as f3_tool38:
    # F3_s39 → F3_t40 (new body)
    with BuildSketch(Plane.YZ.offset(5.08)):
        Polygon((0, -19.0245006301), (3.0456680633, -23.2165030881), (0, -25.4293104623), (-3.0456680633, -23.2165030881), align=None)
    extrude(amount=-F3_T40_DEPTH)

    # F3_s41 → F3_t42 (revolve, cut)
    with BuildSketch(Plane(origin=(5.08, 0, -19.0245006301), x_dir=(0, 0, 1), z_dir=(0, -1, 0))):
        with BuildLine():
            ThreePointArc((0, -5.08), (5.08, 0), (0, 5.08))
            Line((0, 5.08), (0, -5.08))
        make_face()
    revolve(axis=Axis((5.08, 0, -19.0245006301), (-1, 0, 0)), mode=Mode.SUBTRACT)


with BuildPart() as f1_5:
    add(f1_4.part)

    # F3_t37: cut F3_tool38
    add(f3_tool38.part, mode=Mode.SUBTRACT)

    # F4 (on face) → F5 (cut)
    with BuildSketch(Plane(origin=(0, 19.4692152008, 6.3259314889), x_dir=(-1, 0, 0), z_dir=(0, 0.9510565163, 0.3090169944))):
        with Locations((-44.3987917626, 0.1162888882)):
            Rectangle(F4_W, F4_H)
        with Locations((-22.1492082374, 0.1162888882)):
            Rectangle(F4_W, F4_H)
    extrude(amount=-F5_DEPTH, mode=Mode.SUBTRACT)

    # F6 (on face) → F7 (cut)
    with BuildSketch(Plane(origin=(0, 12.0326367284, -16.5615036486), x_dir=(1, 0, 0), z_dir=(0, 0.5877852523, -0.8090169944))):
        with Locations((23.0322839265, 0.0248623613)):
            Rectangle(F6_W, F6_H)
        with Locations((43.5157160735, 0.0248623613)):
            Rectangle(F6_W, F6_H)
    extrude(amount=-F7_DEPTH, mode=Mode.SUBTRACT)

    # F8 (on face) → F9 (cut)
    with BuildSketch(Plane.XY.offset(20.4711443192)):
        with Locations((22.6449199492, -1.054919551)):
            Rectangle(F8_W, F8_H)
        with Locations((43.9030800508, -1.054919551)):
            Rectangle(F8_W, F8_H)
    extrude(amount=-F9_DEPTH, mode=Mode.SUBTRACT)

    # F10 (on face) → F11 (cut)
    with BuildSketch(Plane(origin=(0, -19.4692152008, 6.3259314889), x_dir=(1, 0, 0), z_dir=(0, -0.9510565163, 0.3090169944))):
        with Locations((22.8148490661, -1.0384099957)):
            Rectangle(F10_W, F10_H)
        with Locations((43.7331509339, -1.0384099957)):
            Rectangle(F10_W, F10_H)
    extrude(amount=-F11_DEPTH, mode=Mode.SUBTRACT)

    # F12 (on face) → F13 (cut)
    with BuildSketch(Plane(origin=(0, -12.0326367284, -16.5615036486), x_dir=(1, 0, 0), z_dir=(0, -0.5877852523, -0.8090169944))):
        with Locations((22.2020648891, 0.2502023774)):
            Rectangle(F12_W, F12_H)
        with Locations((44.3459351109, 0.2502023774)):
            Rectangle(F12_W, F12_H)
    extrude(amount=-F13_DEPTH, mode=Mode.SUBTRACT)


solid = f1_5.part
